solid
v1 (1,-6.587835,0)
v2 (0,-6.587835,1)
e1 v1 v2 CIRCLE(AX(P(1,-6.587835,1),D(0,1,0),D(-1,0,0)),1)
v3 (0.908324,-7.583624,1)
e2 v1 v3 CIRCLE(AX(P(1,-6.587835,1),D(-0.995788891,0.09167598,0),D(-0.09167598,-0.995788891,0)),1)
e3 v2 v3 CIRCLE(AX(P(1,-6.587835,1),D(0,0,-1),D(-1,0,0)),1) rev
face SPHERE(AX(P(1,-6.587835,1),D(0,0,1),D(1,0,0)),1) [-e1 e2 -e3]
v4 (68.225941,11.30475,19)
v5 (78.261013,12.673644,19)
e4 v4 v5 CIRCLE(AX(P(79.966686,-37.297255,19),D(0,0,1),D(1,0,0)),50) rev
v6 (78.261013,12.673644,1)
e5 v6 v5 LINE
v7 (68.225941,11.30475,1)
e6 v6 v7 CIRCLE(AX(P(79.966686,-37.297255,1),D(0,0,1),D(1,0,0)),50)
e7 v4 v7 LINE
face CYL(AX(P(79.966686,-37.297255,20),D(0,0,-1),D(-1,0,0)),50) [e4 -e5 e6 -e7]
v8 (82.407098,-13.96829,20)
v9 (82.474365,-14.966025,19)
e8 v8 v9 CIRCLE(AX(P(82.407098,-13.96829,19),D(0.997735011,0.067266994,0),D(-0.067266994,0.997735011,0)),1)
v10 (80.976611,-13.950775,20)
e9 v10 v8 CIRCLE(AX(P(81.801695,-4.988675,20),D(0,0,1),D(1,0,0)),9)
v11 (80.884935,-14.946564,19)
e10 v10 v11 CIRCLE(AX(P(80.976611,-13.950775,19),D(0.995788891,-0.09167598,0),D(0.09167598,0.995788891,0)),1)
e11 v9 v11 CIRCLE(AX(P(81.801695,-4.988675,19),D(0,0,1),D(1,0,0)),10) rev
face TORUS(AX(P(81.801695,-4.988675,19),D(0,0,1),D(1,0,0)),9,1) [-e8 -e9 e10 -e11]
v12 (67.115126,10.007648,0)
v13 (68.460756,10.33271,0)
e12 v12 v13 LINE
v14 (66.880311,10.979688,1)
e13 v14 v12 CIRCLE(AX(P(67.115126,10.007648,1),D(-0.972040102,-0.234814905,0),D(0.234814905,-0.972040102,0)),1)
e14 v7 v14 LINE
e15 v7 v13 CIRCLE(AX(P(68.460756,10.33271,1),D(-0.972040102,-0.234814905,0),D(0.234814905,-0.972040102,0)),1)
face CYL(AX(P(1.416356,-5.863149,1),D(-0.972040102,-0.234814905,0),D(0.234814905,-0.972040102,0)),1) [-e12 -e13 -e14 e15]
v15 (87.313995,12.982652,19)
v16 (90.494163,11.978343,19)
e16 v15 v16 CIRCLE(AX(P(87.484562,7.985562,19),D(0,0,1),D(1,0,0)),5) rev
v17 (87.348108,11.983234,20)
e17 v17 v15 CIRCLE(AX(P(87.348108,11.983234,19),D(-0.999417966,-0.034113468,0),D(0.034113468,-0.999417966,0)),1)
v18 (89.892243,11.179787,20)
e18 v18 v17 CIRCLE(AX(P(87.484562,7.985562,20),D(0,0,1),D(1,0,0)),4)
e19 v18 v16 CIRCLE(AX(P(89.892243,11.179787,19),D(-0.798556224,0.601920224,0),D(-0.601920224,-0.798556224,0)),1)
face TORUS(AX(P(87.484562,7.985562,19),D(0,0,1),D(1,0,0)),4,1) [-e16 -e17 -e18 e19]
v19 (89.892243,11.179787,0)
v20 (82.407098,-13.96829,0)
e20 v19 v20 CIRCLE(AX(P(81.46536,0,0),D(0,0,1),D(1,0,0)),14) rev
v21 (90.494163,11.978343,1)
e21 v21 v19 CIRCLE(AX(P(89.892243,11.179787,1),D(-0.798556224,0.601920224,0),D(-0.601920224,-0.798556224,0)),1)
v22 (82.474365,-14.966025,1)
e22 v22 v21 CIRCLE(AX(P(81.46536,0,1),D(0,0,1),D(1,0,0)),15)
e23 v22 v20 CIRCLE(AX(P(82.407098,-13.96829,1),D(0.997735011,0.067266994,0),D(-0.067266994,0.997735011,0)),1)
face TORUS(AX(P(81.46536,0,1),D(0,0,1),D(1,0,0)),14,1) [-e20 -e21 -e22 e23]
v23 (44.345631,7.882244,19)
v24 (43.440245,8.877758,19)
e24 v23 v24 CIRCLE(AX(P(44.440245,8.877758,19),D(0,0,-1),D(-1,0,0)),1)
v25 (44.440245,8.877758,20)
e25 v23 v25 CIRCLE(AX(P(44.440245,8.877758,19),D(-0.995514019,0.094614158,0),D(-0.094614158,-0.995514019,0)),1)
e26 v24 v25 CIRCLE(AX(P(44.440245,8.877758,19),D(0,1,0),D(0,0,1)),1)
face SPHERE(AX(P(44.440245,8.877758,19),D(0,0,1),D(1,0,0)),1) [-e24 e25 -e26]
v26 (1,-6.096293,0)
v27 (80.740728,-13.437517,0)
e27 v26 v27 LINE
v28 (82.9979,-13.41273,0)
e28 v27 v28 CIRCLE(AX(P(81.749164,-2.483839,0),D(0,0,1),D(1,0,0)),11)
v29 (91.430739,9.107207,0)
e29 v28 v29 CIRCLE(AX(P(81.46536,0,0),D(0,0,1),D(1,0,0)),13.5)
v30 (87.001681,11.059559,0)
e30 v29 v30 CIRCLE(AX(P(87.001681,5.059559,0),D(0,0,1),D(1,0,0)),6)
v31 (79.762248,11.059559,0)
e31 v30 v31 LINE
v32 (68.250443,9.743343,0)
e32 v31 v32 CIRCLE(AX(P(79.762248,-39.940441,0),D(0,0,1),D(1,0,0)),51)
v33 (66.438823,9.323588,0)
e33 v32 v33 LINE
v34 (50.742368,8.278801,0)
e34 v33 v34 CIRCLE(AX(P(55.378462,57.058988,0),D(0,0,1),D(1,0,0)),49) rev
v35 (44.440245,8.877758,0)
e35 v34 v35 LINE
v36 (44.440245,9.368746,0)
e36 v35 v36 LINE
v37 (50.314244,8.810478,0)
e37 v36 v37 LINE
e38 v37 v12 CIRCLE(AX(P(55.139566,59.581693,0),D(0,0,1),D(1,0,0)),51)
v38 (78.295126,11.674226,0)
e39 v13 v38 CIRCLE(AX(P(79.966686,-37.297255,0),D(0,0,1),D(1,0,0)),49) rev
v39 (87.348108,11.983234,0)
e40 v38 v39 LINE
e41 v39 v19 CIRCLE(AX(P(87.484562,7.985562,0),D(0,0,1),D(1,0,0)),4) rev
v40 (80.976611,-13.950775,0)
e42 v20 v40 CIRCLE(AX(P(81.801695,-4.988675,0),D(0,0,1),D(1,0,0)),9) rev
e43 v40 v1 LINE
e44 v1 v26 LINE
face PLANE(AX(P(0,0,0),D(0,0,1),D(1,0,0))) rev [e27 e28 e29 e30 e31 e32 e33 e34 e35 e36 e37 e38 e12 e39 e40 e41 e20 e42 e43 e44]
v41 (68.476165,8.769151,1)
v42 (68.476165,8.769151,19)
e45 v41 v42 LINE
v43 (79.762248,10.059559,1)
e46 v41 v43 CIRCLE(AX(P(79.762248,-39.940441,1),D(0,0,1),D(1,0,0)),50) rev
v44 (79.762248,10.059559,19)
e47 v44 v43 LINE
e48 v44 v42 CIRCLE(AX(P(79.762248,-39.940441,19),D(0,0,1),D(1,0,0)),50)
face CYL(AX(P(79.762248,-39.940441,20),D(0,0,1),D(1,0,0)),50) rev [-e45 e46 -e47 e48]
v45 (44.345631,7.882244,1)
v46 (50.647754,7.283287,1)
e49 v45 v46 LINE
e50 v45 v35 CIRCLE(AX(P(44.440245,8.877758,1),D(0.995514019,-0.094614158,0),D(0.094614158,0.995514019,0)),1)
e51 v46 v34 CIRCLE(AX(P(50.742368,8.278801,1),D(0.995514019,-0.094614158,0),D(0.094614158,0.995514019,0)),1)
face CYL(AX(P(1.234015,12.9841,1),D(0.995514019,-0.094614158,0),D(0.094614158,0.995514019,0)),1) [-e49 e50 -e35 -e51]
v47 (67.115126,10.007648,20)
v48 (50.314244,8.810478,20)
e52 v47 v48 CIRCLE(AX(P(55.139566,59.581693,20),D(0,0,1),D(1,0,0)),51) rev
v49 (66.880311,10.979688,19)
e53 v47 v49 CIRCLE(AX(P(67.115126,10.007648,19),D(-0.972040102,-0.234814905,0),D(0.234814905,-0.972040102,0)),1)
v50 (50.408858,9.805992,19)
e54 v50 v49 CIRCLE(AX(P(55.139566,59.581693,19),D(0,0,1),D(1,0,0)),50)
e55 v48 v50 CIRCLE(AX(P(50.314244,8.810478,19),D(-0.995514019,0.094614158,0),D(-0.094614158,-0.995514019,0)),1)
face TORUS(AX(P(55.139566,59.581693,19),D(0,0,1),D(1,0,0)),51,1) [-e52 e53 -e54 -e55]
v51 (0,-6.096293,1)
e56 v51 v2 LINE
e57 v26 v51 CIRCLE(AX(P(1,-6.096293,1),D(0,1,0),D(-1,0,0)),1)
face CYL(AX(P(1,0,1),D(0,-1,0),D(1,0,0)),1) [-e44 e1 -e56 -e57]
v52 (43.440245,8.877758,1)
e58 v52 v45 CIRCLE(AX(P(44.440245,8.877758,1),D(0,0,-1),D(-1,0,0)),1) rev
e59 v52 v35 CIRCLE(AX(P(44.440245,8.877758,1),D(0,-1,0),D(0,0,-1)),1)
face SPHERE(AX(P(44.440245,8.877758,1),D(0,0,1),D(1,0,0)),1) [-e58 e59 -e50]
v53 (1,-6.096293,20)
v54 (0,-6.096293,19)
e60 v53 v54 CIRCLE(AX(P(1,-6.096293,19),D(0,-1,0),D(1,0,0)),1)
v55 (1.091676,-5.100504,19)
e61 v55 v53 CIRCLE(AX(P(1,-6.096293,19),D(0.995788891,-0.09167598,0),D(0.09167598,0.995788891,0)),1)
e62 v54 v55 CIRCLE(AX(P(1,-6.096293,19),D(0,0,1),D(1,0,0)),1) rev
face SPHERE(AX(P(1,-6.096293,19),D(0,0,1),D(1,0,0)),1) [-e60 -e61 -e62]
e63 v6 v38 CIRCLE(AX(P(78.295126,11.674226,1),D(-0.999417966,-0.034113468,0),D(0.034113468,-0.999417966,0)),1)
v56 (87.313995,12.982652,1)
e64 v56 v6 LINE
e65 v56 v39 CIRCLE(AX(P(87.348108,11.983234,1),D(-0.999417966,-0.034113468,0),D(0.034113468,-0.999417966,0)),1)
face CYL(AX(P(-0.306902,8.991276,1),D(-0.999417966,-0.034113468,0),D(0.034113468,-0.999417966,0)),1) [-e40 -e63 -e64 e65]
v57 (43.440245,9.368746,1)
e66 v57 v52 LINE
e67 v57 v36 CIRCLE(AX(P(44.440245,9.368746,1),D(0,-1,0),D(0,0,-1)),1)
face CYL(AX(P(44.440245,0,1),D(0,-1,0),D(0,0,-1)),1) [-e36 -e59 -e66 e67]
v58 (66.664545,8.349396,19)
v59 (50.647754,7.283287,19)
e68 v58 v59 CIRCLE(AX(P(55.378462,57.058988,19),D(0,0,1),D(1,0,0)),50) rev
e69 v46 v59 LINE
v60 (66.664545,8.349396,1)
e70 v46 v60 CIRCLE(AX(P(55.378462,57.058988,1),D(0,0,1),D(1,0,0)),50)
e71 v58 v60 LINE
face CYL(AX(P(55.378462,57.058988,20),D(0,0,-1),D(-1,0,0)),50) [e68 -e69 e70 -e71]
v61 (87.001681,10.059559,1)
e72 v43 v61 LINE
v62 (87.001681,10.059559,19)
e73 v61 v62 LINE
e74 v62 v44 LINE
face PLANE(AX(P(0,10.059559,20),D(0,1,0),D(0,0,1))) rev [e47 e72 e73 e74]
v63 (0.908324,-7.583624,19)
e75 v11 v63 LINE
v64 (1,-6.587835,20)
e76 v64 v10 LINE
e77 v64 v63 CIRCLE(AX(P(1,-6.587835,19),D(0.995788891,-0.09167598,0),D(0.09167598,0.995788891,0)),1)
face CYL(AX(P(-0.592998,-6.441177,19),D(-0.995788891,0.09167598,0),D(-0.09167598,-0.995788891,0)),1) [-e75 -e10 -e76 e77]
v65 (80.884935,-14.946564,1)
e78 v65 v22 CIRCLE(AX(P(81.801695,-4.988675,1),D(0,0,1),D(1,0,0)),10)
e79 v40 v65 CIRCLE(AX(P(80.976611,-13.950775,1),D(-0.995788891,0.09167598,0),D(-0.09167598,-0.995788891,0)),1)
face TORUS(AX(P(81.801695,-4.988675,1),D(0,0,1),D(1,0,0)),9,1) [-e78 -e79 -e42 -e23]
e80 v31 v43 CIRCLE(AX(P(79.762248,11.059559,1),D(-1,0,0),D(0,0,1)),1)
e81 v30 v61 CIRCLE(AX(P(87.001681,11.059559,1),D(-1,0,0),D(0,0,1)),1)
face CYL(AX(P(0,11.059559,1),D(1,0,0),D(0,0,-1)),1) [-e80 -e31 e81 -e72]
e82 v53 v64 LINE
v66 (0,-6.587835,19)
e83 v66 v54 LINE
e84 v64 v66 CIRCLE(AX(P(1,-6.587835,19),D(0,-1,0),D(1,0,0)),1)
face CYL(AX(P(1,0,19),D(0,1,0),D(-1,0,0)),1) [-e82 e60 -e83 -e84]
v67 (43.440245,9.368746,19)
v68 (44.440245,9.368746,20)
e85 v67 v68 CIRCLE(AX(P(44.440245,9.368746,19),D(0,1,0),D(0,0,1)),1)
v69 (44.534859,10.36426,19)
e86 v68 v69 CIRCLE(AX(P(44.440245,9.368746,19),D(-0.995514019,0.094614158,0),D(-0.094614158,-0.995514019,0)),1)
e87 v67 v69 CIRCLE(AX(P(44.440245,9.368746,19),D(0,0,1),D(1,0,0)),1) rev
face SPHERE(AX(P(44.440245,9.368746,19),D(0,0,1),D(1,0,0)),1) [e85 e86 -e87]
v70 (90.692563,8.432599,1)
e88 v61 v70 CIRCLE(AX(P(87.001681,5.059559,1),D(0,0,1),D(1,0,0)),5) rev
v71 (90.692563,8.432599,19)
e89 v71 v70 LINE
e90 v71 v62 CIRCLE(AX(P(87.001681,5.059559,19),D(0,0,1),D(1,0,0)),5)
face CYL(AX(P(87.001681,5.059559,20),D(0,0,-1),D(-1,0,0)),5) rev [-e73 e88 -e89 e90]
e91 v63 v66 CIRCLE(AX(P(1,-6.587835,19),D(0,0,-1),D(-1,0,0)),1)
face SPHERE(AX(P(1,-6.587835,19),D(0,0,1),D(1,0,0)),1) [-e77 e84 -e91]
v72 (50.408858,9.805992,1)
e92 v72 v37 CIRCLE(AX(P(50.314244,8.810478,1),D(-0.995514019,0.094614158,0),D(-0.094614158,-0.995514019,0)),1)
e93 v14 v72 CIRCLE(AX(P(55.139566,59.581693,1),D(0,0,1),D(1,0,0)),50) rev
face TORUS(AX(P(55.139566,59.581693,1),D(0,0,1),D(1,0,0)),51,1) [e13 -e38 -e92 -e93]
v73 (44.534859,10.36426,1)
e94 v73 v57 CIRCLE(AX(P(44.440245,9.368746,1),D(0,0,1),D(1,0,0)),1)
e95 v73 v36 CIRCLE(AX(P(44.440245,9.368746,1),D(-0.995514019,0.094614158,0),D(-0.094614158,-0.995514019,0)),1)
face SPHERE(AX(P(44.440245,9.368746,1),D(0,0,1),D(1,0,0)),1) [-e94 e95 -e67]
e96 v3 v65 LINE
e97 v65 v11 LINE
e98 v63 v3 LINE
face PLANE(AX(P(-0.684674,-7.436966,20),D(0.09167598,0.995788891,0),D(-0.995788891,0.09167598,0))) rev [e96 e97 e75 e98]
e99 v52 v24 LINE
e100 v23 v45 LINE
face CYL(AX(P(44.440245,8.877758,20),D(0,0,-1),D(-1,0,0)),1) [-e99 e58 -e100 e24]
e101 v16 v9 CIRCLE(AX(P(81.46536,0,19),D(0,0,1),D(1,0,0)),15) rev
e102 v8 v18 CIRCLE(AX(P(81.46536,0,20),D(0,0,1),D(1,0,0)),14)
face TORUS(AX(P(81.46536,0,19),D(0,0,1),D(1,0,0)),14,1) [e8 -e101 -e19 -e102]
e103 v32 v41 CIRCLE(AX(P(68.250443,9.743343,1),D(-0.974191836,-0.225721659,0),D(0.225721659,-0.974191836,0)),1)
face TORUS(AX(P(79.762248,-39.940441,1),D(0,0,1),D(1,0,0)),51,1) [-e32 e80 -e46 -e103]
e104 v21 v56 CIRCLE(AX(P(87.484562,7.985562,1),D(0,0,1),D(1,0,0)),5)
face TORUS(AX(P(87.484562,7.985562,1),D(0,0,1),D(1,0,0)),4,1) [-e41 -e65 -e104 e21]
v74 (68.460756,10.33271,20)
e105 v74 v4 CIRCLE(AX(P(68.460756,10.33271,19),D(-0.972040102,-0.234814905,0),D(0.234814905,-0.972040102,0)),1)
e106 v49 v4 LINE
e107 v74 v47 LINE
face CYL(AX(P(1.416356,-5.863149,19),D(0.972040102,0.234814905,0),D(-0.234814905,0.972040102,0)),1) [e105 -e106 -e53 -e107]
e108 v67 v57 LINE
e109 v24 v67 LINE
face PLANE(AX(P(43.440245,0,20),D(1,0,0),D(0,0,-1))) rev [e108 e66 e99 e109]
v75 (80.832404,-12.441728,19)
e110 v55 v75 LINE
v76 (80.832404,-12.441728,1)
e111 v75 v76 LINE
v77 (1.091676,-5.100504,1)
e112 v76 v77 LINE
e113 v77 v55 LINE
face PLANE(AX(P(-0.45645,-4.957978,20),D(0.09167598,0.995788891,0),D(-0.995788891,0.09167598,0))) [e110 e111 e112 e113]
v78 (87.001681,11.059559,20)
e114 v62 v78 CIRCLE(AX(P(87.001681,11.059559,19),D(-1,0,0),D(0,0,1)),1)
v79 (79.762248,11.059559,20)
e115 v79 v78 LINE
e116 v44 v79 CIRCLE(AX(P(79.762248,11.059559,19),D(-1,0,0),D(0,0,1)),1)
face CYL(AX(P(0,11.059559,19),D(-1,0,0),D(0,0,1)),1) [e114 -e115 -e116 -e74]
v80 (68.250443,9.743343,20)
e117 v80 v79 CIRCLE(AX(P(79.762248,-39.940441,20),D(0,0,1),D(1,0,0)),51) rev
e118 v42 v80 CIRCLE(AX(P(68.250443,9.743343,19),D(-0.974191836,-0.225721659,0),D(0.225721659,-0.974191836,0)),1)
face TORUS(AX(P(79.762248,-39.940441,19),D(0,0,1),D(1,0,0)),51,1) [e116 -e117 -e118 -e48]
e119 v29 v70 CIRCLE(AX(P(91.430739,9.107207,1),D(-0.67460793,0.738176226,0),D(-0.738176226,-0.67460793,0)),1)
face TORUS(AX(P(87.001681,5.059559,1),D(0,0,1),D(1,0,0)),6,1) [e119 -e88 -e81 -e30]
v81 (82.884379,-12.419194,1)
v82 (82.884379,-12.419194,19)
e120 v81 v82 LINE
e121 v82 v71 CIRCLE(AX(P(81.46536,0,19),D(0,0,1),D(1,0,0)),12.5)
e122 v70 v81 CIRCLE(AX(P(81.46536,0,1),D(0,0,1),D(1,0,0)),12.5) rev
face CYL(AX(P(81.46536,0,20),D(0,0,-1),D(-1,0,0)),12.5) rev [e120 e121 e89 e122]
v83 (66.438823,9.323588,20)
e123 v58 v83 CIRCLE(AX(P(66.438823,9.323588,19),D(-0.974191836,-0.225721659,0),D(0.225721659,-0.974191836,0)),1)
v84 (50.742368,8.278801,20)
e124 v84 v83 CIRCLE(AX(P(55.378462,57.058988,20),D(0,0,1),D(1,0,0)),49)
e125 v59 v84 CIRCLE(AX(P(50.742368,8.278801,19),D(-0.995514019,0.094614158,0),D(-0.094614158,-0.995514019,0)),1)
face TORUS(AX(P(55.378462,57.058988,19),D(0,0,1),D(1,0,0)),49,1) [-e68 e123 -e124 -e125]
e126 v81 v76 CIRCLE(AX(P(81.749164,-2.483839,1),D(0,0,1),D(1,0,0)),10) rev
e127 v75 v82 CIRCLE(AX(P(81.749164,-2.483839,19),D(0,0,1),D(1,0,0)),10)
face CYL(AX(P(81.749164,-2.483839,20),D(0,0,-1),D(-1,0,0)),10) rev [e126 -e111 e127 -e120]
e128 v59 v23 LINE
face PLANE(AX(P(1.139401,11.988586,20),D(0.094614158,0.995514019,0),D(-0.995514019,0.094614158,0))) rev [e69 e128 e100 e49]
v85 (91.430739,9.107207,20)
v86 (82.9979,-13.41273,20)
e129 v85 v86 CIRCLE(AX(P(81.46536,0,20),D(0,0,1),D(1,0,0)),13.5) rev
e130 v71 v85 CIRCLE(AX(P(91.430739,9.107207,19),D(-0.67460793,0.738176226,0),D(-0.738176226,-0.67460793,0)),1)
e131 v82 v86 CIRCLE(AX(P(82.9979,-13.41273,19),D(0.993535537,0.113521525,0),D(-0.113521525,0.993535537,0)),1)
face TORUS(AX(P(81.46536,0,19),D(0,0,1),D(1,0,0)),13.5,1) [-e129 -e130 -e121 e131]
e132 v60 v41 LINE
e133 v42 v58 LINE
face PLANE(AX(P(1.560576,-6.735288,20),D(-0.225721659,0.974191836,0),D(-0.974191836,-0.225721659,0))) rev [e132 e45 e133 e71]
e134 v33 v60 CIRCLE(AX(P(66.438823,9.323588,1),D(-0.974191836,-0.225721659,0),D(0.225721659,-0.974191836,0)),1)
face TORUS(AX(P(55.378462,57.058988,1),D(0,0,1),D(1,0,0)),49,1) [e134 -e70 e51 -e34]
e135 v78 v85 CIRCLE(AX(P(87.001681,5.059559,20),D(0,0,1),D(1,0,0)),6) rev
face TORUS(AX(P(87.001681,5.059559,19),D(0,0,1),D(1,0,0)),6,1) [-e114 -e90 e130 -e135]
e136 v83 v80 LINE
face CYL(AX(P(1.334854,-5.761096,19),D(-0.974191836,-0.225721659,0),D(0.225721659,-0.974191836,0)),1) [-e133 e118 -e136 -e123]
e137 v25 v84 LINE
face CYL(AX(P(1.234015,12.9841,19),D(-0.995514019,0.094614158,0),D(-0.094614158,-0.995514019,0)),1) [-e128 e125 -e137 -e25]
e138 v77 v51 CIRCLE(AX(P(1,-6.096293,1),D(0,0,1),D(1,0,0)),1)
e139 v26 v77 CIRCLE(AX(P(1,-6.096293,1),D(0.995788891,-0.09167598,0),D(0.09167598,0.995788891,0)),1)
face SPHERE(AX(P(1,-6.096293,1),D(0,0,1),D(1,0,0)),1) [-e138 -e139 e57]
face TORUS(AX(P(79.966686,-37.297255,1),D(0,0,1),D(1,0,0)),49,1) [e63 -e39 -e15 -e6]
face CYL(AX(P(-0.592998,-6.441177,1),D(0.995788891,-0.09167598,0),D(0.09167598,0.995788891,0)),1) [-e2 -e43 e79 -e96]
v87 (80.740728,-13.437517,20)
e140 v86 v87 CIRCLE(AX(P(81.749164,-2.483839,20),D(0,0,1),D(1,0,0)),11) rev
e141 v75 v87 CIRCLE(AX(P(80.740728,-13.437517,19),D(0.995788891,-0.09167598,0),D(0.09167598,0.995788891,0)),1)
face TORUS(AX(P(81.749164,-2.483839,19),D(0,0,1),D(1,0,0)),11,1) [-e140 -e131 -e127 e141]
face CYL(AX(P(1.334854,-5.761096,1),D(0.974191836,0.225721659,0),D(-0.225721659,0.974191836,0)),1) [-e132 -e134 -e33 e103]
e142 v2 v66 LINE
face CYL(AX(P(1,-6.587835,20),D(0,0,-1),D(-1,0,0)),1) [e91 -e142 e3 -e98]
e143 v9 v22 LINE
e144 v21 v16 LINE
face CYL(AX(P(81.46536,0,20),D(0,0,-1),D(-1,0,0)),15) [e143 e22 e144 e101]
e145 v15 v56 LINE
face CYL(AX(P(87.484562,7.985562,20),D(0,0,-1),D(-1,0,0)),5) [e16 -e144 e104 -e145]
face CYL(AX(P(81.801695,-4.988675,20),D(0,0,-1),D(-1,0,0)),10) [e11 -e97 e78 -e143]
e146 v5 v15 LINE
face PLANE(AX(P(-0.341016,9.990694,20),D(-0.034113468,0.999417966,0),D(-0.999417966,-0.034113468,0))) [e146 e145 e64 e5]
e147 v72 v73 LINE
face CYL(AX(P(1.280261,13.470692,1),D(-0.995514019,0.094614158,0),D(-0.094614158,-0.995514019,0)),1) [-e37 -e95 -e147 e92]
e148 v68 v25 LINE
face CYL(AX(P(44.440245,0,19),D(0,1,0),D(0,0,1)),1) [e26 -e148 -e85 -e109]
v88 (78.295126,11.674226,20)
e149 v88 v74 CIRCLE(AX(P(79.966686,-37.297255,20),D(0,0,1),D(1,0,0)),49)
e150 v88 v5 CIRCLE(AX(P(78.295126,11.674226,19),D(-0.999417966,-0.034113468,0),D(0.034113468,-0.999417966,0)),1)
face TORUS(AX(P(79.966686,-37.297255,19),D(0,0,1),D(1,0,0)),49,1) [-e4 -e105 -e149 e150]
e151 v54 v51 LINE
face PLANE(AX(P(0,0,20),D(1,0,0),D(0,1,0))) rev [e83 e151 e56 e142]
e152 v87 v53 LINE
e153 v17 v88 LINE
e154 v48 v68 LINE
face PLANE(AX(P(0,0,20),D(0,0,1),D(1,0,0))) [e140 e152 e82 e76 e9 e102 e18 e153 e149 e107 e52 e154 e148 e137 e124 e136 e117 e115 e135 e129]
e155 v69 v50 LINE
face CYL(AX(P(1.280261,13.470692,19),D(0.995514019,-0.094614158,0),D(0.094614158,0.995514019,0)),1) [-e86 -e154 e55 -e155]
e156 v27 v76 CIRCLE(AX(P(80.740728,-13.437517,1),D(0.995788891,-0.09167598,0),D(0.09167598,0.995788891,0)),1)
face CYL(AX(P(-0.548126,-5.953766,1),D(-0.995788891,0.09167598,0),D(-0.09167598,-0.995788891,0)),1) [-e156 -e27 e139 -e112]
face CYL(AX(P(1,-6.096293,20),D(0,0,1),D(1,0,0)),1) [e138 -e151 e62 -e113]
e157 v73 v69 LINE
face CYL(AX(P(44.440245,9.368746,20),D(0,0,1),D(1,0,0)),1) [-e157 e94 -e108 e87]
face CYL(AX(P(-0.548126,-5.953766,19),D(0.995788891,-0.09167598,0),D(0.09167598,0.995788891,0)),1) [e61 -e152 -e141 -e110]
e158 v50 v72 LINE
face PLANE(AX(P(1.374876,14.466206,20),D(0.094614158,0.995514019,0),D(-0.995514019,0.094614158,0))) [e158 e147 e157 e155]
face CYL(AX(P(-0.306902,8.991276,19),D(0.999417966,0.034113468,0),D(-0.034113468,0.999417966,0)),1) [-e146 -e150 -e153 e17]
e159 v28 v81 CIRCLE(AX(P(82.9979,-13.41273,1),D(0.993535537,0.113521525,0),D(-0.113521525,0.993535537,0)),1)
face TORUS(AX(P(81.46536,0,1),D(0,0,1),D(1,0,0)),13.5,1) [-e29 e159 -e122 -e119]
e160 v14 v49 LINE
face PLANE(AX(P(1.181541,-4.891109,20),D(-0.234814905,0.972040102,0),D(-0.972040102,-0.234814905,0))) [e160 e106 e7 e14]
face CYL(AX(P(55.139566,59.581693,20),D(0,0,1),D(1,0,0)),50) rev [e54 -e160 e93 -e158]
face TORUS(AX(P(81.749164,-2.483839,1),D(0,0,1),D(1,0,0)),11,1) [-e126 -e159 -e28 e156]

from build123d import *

# Parameters (mm, degrees)
BOSS_EXTRUDE1_DEPTH = 20
FILLET1_R           = 50
FILLET2_R           = 50
FILLET3_R           = 5
FILLET4_R           = 10
FILLET5_R           = 1
FILLET6_R           = 1


with BuildPart() as part:
    # Sketch1 → Boss-Extrude1 (new body)
    with BuildSketch(Plane.XY):
        with BuildLine():
            Line((1.53e-15, -7.5), (81.46535975563725, -15))
            ThreePointArc((81.46535975563725, -15), (95.96612319887386, -3.8376893521092743), (88.88528315077919, 13.036285391560943))
            Line((88.88528315077919, 13.036285391560943), (73.17379777974874, 12.49999999999999))
            Line((73.17379777974874, 12.49999999999999), (58.74284079566012, 9.013925925539251))
            Line((58.74284079566012, 9.013925925539251), (43.44024523082493, 10.4682923771142))
            Line((43.44024523082493, 10.4682923771142), (43.44024523082493, 7.968292377114199))
            Line((43.44024523082493, 7.968292377114199), (58.74284079566012, 6.51392592553925))
            Line((58.74284079566012, 6.51392592553925), (74.04543636049529, 10.059559473964299))
            Line((74.04543636049529, 10.059559473964299), (88.88528315077919, 10.059559473964299))
            ThreePointArc((88.88528315077919, 10.059559473964299), (93.33958590778194, -3.9054773444129744), (81.46535975563725, -12.49999999999999))
            Line((81.46535975563725, -12.49999999999999), (-7.7e-16, -5))
            Line((-7.7e-16, -5), (1.53e-15, -7.5))
        make_face()
    extrude(amount=BOSS_EXTRUDE1_DEPTH)

    # Fillet1
    fillet1_edges = [part.edges().sort_by_distance(p)[0] for p in [
        (58.74284079566012, 9.013925925539251, 10),
        (73.17379777974874, 12.49999999999999, 10),
    ]]
    fillet(fillet1_edges, radius=FILLET1_R)

    # Fillet2
    fillet2_edges = [part.edges().sort_by_distance(p)[0] for p in [
        (74.04543636049529, 10.059559473964299, 10),
        (58.74284079566012, 6.51392592553925, 10),
    ]]
    fillet(fillet2_edges, radius=FILLET2_R)

    # Fillet3
    fillet3_edges = [part.edges().sort_by_distance(p)[0] for p in [
        (88.88528315077919, 10.059559473964299, 10),
        (88.88528315077919, 13.036285391560945, 10),
    ]]
    fillet(fillet3_edges, radius=FILLET3_R)

    # Fillet4
    # the kernel refuses this fillet: 10 mm, written as the material it adds along each edge
    with BuildSketch(Plane(origin=(81.46535975563725, -12.499999999999993, 0), x_dir=(0.9983825762287738, 0.05685271746184882, 0), z_dir=(0, 0, 1))) as fillet4_piece_1:
        with BuildLine():
            CenterArc((0.8527907619277444, 9.983825762287736), FILLET4_R, 261.4807895615496, 11.77838854979251)
            Line((-0.6286192920357523, 0.09416326794467102), (0, 0))
            ThreePointArc((0, 0), (0.7106589682731511, -0.02021779714032781), (1.4213179365462814, 1e-17))
        make_face()
    extrude(amount=20)
    # the kernel refuses this fillet: 10 mm, written as the material it takes off along each edge
    with BuildSketch(Plane(origin=(81.46535975563715, -14.999999999999993, -2.523941837712784), x_dir=(-0.9957888906378437, 0.09167597985433422, 0), z_dir=(0, 0, 1))) as fillet4_2_piece_1:
        with BuildLine():
            CenterArc((0.5828793997689569, -10), FILLET4_R, 90.00000000000003, 9.11705963897387)
            ThreePointArc((-1.0016411963229432, -0.12633328086467327), (-0.5018837587629004, -0.05473730613968529), (0, 0))
            Line((0, 0), (0.5828793997689534, 0))
        make_face()
    extrude(amount=25.047883675425567, mode=Mode.SUBTRACT)

    # Fillet5
    fillet5_edges = [part.edges().sort_by_distance(p)[0] for p in [
        (1.53e-15, -7.5, 10),
        (-7.7e-16, -5, 10),
        (43.44024523082493, 7.968292377114199, 10),
        (43.44024523082493, 10.4682923771142, 10),
    ]]
    fillet(fillet5_edges, radius=FILLET5_R)

    # Fillet6
    fillet6_edges = [part.edges().sort_by_distance(p)[0] for p in [
        (67.55312596624809, 11.142219063385667, 0),
        (67.55312596624809, 11.142219063385667, 20),
        (82.78750373367262, 12.828147844719894, 0),
        (73.2087271321753, 12.243940169804823, 0),
        (82.78750373367262, 12.828147844719894, 20),
        (73.2087271321753, 12.243940169804823, 20),
        (58.69337304228126, 9.708148200467306, 0),
        (58.69337304228126, 9.708148200467306, 20),
        (83.38196474552188, 10.059559473964299, 0),
        (83.38196474552188, 10.059559473964299, 20),
        (67.57035497563798, 8.559273742065987, 0),
        (67.57035497563798, 8.559273742065987, 20),
        (58.69921223462093, 7.16938370928515, 0),
        (58.69921223462093, 7.16938370928515, 20),
        (74.08244123035955, 9.73590992988975, 0),
        (74.08244123035955, 9.73590992988975, 20),
        (88.99028016615965, 12.753456202652604, 0),
        (88.99028016615965, 12.753456202652604, 20),
        (89.0184612808635, 9.634775220054735, 0),
        (89.0184612808635, 9.634775220054735, 20),
        (95.84204739674057, -4.27911818838268, 0),
        (95.84204739674057, -4.27911818838268, 20),
        (93.17154749853181, -4.383510981862012, 0),
        (81.6792624975188, -14.987925542926858, 0),
        (93.17154749853181, -4.383510981862012, 20),
        (81.6792624975188, -14.987925542926858, 20),
        (81.85897083662152, -12.483235942602048, 0),
        (81.85897083662152, -12.483235942602048, 20),
        (47.4966925492185, 7.582765564524983, 0),
        (47.4966925492185, 7.582765564524983, 20),
        (40.89662947245553, -11.265093801383376, 0),
        (4.7e-16, -6.342063670037142, 0),
        (40.96203987478691, -8.771115723080602, 0),
        (43.44024523082493, 9.123251869416467, 0),
        (47.471858609430626, 10.085125794770558, 0),
        (0.326084567565907, -5.3574840944297595, 0),
        (0.261191506595139, -7.2617501846737555, 0),
        (43.767420646607164, 10.108547727110885, 0),
        (43.70044317698066, 8.204933481348554, 0),
        (43.44024523082493, 9.123251869416467, 20),
        (40.89662947245553, -11.265093801383376, 20),
        (47.471858609430626, 10.085125794770558, 20),
        (40.96203987478691, -8.771115723080602, 20),
        (4.7e-16, -6.342063670037142, 20),
        (0.326084567565907, -5.3574840944297595, 20),
        (0.261191506595139, -7.2617501846737555, 20),
        (43.767420646607164, 10.108547727110885, 20),
        (43.70044317698066, 8.204933481348554, 20),
    ]]
    fillet(fillet6_edges, radius=FILLET6_R)


solid = part.part
